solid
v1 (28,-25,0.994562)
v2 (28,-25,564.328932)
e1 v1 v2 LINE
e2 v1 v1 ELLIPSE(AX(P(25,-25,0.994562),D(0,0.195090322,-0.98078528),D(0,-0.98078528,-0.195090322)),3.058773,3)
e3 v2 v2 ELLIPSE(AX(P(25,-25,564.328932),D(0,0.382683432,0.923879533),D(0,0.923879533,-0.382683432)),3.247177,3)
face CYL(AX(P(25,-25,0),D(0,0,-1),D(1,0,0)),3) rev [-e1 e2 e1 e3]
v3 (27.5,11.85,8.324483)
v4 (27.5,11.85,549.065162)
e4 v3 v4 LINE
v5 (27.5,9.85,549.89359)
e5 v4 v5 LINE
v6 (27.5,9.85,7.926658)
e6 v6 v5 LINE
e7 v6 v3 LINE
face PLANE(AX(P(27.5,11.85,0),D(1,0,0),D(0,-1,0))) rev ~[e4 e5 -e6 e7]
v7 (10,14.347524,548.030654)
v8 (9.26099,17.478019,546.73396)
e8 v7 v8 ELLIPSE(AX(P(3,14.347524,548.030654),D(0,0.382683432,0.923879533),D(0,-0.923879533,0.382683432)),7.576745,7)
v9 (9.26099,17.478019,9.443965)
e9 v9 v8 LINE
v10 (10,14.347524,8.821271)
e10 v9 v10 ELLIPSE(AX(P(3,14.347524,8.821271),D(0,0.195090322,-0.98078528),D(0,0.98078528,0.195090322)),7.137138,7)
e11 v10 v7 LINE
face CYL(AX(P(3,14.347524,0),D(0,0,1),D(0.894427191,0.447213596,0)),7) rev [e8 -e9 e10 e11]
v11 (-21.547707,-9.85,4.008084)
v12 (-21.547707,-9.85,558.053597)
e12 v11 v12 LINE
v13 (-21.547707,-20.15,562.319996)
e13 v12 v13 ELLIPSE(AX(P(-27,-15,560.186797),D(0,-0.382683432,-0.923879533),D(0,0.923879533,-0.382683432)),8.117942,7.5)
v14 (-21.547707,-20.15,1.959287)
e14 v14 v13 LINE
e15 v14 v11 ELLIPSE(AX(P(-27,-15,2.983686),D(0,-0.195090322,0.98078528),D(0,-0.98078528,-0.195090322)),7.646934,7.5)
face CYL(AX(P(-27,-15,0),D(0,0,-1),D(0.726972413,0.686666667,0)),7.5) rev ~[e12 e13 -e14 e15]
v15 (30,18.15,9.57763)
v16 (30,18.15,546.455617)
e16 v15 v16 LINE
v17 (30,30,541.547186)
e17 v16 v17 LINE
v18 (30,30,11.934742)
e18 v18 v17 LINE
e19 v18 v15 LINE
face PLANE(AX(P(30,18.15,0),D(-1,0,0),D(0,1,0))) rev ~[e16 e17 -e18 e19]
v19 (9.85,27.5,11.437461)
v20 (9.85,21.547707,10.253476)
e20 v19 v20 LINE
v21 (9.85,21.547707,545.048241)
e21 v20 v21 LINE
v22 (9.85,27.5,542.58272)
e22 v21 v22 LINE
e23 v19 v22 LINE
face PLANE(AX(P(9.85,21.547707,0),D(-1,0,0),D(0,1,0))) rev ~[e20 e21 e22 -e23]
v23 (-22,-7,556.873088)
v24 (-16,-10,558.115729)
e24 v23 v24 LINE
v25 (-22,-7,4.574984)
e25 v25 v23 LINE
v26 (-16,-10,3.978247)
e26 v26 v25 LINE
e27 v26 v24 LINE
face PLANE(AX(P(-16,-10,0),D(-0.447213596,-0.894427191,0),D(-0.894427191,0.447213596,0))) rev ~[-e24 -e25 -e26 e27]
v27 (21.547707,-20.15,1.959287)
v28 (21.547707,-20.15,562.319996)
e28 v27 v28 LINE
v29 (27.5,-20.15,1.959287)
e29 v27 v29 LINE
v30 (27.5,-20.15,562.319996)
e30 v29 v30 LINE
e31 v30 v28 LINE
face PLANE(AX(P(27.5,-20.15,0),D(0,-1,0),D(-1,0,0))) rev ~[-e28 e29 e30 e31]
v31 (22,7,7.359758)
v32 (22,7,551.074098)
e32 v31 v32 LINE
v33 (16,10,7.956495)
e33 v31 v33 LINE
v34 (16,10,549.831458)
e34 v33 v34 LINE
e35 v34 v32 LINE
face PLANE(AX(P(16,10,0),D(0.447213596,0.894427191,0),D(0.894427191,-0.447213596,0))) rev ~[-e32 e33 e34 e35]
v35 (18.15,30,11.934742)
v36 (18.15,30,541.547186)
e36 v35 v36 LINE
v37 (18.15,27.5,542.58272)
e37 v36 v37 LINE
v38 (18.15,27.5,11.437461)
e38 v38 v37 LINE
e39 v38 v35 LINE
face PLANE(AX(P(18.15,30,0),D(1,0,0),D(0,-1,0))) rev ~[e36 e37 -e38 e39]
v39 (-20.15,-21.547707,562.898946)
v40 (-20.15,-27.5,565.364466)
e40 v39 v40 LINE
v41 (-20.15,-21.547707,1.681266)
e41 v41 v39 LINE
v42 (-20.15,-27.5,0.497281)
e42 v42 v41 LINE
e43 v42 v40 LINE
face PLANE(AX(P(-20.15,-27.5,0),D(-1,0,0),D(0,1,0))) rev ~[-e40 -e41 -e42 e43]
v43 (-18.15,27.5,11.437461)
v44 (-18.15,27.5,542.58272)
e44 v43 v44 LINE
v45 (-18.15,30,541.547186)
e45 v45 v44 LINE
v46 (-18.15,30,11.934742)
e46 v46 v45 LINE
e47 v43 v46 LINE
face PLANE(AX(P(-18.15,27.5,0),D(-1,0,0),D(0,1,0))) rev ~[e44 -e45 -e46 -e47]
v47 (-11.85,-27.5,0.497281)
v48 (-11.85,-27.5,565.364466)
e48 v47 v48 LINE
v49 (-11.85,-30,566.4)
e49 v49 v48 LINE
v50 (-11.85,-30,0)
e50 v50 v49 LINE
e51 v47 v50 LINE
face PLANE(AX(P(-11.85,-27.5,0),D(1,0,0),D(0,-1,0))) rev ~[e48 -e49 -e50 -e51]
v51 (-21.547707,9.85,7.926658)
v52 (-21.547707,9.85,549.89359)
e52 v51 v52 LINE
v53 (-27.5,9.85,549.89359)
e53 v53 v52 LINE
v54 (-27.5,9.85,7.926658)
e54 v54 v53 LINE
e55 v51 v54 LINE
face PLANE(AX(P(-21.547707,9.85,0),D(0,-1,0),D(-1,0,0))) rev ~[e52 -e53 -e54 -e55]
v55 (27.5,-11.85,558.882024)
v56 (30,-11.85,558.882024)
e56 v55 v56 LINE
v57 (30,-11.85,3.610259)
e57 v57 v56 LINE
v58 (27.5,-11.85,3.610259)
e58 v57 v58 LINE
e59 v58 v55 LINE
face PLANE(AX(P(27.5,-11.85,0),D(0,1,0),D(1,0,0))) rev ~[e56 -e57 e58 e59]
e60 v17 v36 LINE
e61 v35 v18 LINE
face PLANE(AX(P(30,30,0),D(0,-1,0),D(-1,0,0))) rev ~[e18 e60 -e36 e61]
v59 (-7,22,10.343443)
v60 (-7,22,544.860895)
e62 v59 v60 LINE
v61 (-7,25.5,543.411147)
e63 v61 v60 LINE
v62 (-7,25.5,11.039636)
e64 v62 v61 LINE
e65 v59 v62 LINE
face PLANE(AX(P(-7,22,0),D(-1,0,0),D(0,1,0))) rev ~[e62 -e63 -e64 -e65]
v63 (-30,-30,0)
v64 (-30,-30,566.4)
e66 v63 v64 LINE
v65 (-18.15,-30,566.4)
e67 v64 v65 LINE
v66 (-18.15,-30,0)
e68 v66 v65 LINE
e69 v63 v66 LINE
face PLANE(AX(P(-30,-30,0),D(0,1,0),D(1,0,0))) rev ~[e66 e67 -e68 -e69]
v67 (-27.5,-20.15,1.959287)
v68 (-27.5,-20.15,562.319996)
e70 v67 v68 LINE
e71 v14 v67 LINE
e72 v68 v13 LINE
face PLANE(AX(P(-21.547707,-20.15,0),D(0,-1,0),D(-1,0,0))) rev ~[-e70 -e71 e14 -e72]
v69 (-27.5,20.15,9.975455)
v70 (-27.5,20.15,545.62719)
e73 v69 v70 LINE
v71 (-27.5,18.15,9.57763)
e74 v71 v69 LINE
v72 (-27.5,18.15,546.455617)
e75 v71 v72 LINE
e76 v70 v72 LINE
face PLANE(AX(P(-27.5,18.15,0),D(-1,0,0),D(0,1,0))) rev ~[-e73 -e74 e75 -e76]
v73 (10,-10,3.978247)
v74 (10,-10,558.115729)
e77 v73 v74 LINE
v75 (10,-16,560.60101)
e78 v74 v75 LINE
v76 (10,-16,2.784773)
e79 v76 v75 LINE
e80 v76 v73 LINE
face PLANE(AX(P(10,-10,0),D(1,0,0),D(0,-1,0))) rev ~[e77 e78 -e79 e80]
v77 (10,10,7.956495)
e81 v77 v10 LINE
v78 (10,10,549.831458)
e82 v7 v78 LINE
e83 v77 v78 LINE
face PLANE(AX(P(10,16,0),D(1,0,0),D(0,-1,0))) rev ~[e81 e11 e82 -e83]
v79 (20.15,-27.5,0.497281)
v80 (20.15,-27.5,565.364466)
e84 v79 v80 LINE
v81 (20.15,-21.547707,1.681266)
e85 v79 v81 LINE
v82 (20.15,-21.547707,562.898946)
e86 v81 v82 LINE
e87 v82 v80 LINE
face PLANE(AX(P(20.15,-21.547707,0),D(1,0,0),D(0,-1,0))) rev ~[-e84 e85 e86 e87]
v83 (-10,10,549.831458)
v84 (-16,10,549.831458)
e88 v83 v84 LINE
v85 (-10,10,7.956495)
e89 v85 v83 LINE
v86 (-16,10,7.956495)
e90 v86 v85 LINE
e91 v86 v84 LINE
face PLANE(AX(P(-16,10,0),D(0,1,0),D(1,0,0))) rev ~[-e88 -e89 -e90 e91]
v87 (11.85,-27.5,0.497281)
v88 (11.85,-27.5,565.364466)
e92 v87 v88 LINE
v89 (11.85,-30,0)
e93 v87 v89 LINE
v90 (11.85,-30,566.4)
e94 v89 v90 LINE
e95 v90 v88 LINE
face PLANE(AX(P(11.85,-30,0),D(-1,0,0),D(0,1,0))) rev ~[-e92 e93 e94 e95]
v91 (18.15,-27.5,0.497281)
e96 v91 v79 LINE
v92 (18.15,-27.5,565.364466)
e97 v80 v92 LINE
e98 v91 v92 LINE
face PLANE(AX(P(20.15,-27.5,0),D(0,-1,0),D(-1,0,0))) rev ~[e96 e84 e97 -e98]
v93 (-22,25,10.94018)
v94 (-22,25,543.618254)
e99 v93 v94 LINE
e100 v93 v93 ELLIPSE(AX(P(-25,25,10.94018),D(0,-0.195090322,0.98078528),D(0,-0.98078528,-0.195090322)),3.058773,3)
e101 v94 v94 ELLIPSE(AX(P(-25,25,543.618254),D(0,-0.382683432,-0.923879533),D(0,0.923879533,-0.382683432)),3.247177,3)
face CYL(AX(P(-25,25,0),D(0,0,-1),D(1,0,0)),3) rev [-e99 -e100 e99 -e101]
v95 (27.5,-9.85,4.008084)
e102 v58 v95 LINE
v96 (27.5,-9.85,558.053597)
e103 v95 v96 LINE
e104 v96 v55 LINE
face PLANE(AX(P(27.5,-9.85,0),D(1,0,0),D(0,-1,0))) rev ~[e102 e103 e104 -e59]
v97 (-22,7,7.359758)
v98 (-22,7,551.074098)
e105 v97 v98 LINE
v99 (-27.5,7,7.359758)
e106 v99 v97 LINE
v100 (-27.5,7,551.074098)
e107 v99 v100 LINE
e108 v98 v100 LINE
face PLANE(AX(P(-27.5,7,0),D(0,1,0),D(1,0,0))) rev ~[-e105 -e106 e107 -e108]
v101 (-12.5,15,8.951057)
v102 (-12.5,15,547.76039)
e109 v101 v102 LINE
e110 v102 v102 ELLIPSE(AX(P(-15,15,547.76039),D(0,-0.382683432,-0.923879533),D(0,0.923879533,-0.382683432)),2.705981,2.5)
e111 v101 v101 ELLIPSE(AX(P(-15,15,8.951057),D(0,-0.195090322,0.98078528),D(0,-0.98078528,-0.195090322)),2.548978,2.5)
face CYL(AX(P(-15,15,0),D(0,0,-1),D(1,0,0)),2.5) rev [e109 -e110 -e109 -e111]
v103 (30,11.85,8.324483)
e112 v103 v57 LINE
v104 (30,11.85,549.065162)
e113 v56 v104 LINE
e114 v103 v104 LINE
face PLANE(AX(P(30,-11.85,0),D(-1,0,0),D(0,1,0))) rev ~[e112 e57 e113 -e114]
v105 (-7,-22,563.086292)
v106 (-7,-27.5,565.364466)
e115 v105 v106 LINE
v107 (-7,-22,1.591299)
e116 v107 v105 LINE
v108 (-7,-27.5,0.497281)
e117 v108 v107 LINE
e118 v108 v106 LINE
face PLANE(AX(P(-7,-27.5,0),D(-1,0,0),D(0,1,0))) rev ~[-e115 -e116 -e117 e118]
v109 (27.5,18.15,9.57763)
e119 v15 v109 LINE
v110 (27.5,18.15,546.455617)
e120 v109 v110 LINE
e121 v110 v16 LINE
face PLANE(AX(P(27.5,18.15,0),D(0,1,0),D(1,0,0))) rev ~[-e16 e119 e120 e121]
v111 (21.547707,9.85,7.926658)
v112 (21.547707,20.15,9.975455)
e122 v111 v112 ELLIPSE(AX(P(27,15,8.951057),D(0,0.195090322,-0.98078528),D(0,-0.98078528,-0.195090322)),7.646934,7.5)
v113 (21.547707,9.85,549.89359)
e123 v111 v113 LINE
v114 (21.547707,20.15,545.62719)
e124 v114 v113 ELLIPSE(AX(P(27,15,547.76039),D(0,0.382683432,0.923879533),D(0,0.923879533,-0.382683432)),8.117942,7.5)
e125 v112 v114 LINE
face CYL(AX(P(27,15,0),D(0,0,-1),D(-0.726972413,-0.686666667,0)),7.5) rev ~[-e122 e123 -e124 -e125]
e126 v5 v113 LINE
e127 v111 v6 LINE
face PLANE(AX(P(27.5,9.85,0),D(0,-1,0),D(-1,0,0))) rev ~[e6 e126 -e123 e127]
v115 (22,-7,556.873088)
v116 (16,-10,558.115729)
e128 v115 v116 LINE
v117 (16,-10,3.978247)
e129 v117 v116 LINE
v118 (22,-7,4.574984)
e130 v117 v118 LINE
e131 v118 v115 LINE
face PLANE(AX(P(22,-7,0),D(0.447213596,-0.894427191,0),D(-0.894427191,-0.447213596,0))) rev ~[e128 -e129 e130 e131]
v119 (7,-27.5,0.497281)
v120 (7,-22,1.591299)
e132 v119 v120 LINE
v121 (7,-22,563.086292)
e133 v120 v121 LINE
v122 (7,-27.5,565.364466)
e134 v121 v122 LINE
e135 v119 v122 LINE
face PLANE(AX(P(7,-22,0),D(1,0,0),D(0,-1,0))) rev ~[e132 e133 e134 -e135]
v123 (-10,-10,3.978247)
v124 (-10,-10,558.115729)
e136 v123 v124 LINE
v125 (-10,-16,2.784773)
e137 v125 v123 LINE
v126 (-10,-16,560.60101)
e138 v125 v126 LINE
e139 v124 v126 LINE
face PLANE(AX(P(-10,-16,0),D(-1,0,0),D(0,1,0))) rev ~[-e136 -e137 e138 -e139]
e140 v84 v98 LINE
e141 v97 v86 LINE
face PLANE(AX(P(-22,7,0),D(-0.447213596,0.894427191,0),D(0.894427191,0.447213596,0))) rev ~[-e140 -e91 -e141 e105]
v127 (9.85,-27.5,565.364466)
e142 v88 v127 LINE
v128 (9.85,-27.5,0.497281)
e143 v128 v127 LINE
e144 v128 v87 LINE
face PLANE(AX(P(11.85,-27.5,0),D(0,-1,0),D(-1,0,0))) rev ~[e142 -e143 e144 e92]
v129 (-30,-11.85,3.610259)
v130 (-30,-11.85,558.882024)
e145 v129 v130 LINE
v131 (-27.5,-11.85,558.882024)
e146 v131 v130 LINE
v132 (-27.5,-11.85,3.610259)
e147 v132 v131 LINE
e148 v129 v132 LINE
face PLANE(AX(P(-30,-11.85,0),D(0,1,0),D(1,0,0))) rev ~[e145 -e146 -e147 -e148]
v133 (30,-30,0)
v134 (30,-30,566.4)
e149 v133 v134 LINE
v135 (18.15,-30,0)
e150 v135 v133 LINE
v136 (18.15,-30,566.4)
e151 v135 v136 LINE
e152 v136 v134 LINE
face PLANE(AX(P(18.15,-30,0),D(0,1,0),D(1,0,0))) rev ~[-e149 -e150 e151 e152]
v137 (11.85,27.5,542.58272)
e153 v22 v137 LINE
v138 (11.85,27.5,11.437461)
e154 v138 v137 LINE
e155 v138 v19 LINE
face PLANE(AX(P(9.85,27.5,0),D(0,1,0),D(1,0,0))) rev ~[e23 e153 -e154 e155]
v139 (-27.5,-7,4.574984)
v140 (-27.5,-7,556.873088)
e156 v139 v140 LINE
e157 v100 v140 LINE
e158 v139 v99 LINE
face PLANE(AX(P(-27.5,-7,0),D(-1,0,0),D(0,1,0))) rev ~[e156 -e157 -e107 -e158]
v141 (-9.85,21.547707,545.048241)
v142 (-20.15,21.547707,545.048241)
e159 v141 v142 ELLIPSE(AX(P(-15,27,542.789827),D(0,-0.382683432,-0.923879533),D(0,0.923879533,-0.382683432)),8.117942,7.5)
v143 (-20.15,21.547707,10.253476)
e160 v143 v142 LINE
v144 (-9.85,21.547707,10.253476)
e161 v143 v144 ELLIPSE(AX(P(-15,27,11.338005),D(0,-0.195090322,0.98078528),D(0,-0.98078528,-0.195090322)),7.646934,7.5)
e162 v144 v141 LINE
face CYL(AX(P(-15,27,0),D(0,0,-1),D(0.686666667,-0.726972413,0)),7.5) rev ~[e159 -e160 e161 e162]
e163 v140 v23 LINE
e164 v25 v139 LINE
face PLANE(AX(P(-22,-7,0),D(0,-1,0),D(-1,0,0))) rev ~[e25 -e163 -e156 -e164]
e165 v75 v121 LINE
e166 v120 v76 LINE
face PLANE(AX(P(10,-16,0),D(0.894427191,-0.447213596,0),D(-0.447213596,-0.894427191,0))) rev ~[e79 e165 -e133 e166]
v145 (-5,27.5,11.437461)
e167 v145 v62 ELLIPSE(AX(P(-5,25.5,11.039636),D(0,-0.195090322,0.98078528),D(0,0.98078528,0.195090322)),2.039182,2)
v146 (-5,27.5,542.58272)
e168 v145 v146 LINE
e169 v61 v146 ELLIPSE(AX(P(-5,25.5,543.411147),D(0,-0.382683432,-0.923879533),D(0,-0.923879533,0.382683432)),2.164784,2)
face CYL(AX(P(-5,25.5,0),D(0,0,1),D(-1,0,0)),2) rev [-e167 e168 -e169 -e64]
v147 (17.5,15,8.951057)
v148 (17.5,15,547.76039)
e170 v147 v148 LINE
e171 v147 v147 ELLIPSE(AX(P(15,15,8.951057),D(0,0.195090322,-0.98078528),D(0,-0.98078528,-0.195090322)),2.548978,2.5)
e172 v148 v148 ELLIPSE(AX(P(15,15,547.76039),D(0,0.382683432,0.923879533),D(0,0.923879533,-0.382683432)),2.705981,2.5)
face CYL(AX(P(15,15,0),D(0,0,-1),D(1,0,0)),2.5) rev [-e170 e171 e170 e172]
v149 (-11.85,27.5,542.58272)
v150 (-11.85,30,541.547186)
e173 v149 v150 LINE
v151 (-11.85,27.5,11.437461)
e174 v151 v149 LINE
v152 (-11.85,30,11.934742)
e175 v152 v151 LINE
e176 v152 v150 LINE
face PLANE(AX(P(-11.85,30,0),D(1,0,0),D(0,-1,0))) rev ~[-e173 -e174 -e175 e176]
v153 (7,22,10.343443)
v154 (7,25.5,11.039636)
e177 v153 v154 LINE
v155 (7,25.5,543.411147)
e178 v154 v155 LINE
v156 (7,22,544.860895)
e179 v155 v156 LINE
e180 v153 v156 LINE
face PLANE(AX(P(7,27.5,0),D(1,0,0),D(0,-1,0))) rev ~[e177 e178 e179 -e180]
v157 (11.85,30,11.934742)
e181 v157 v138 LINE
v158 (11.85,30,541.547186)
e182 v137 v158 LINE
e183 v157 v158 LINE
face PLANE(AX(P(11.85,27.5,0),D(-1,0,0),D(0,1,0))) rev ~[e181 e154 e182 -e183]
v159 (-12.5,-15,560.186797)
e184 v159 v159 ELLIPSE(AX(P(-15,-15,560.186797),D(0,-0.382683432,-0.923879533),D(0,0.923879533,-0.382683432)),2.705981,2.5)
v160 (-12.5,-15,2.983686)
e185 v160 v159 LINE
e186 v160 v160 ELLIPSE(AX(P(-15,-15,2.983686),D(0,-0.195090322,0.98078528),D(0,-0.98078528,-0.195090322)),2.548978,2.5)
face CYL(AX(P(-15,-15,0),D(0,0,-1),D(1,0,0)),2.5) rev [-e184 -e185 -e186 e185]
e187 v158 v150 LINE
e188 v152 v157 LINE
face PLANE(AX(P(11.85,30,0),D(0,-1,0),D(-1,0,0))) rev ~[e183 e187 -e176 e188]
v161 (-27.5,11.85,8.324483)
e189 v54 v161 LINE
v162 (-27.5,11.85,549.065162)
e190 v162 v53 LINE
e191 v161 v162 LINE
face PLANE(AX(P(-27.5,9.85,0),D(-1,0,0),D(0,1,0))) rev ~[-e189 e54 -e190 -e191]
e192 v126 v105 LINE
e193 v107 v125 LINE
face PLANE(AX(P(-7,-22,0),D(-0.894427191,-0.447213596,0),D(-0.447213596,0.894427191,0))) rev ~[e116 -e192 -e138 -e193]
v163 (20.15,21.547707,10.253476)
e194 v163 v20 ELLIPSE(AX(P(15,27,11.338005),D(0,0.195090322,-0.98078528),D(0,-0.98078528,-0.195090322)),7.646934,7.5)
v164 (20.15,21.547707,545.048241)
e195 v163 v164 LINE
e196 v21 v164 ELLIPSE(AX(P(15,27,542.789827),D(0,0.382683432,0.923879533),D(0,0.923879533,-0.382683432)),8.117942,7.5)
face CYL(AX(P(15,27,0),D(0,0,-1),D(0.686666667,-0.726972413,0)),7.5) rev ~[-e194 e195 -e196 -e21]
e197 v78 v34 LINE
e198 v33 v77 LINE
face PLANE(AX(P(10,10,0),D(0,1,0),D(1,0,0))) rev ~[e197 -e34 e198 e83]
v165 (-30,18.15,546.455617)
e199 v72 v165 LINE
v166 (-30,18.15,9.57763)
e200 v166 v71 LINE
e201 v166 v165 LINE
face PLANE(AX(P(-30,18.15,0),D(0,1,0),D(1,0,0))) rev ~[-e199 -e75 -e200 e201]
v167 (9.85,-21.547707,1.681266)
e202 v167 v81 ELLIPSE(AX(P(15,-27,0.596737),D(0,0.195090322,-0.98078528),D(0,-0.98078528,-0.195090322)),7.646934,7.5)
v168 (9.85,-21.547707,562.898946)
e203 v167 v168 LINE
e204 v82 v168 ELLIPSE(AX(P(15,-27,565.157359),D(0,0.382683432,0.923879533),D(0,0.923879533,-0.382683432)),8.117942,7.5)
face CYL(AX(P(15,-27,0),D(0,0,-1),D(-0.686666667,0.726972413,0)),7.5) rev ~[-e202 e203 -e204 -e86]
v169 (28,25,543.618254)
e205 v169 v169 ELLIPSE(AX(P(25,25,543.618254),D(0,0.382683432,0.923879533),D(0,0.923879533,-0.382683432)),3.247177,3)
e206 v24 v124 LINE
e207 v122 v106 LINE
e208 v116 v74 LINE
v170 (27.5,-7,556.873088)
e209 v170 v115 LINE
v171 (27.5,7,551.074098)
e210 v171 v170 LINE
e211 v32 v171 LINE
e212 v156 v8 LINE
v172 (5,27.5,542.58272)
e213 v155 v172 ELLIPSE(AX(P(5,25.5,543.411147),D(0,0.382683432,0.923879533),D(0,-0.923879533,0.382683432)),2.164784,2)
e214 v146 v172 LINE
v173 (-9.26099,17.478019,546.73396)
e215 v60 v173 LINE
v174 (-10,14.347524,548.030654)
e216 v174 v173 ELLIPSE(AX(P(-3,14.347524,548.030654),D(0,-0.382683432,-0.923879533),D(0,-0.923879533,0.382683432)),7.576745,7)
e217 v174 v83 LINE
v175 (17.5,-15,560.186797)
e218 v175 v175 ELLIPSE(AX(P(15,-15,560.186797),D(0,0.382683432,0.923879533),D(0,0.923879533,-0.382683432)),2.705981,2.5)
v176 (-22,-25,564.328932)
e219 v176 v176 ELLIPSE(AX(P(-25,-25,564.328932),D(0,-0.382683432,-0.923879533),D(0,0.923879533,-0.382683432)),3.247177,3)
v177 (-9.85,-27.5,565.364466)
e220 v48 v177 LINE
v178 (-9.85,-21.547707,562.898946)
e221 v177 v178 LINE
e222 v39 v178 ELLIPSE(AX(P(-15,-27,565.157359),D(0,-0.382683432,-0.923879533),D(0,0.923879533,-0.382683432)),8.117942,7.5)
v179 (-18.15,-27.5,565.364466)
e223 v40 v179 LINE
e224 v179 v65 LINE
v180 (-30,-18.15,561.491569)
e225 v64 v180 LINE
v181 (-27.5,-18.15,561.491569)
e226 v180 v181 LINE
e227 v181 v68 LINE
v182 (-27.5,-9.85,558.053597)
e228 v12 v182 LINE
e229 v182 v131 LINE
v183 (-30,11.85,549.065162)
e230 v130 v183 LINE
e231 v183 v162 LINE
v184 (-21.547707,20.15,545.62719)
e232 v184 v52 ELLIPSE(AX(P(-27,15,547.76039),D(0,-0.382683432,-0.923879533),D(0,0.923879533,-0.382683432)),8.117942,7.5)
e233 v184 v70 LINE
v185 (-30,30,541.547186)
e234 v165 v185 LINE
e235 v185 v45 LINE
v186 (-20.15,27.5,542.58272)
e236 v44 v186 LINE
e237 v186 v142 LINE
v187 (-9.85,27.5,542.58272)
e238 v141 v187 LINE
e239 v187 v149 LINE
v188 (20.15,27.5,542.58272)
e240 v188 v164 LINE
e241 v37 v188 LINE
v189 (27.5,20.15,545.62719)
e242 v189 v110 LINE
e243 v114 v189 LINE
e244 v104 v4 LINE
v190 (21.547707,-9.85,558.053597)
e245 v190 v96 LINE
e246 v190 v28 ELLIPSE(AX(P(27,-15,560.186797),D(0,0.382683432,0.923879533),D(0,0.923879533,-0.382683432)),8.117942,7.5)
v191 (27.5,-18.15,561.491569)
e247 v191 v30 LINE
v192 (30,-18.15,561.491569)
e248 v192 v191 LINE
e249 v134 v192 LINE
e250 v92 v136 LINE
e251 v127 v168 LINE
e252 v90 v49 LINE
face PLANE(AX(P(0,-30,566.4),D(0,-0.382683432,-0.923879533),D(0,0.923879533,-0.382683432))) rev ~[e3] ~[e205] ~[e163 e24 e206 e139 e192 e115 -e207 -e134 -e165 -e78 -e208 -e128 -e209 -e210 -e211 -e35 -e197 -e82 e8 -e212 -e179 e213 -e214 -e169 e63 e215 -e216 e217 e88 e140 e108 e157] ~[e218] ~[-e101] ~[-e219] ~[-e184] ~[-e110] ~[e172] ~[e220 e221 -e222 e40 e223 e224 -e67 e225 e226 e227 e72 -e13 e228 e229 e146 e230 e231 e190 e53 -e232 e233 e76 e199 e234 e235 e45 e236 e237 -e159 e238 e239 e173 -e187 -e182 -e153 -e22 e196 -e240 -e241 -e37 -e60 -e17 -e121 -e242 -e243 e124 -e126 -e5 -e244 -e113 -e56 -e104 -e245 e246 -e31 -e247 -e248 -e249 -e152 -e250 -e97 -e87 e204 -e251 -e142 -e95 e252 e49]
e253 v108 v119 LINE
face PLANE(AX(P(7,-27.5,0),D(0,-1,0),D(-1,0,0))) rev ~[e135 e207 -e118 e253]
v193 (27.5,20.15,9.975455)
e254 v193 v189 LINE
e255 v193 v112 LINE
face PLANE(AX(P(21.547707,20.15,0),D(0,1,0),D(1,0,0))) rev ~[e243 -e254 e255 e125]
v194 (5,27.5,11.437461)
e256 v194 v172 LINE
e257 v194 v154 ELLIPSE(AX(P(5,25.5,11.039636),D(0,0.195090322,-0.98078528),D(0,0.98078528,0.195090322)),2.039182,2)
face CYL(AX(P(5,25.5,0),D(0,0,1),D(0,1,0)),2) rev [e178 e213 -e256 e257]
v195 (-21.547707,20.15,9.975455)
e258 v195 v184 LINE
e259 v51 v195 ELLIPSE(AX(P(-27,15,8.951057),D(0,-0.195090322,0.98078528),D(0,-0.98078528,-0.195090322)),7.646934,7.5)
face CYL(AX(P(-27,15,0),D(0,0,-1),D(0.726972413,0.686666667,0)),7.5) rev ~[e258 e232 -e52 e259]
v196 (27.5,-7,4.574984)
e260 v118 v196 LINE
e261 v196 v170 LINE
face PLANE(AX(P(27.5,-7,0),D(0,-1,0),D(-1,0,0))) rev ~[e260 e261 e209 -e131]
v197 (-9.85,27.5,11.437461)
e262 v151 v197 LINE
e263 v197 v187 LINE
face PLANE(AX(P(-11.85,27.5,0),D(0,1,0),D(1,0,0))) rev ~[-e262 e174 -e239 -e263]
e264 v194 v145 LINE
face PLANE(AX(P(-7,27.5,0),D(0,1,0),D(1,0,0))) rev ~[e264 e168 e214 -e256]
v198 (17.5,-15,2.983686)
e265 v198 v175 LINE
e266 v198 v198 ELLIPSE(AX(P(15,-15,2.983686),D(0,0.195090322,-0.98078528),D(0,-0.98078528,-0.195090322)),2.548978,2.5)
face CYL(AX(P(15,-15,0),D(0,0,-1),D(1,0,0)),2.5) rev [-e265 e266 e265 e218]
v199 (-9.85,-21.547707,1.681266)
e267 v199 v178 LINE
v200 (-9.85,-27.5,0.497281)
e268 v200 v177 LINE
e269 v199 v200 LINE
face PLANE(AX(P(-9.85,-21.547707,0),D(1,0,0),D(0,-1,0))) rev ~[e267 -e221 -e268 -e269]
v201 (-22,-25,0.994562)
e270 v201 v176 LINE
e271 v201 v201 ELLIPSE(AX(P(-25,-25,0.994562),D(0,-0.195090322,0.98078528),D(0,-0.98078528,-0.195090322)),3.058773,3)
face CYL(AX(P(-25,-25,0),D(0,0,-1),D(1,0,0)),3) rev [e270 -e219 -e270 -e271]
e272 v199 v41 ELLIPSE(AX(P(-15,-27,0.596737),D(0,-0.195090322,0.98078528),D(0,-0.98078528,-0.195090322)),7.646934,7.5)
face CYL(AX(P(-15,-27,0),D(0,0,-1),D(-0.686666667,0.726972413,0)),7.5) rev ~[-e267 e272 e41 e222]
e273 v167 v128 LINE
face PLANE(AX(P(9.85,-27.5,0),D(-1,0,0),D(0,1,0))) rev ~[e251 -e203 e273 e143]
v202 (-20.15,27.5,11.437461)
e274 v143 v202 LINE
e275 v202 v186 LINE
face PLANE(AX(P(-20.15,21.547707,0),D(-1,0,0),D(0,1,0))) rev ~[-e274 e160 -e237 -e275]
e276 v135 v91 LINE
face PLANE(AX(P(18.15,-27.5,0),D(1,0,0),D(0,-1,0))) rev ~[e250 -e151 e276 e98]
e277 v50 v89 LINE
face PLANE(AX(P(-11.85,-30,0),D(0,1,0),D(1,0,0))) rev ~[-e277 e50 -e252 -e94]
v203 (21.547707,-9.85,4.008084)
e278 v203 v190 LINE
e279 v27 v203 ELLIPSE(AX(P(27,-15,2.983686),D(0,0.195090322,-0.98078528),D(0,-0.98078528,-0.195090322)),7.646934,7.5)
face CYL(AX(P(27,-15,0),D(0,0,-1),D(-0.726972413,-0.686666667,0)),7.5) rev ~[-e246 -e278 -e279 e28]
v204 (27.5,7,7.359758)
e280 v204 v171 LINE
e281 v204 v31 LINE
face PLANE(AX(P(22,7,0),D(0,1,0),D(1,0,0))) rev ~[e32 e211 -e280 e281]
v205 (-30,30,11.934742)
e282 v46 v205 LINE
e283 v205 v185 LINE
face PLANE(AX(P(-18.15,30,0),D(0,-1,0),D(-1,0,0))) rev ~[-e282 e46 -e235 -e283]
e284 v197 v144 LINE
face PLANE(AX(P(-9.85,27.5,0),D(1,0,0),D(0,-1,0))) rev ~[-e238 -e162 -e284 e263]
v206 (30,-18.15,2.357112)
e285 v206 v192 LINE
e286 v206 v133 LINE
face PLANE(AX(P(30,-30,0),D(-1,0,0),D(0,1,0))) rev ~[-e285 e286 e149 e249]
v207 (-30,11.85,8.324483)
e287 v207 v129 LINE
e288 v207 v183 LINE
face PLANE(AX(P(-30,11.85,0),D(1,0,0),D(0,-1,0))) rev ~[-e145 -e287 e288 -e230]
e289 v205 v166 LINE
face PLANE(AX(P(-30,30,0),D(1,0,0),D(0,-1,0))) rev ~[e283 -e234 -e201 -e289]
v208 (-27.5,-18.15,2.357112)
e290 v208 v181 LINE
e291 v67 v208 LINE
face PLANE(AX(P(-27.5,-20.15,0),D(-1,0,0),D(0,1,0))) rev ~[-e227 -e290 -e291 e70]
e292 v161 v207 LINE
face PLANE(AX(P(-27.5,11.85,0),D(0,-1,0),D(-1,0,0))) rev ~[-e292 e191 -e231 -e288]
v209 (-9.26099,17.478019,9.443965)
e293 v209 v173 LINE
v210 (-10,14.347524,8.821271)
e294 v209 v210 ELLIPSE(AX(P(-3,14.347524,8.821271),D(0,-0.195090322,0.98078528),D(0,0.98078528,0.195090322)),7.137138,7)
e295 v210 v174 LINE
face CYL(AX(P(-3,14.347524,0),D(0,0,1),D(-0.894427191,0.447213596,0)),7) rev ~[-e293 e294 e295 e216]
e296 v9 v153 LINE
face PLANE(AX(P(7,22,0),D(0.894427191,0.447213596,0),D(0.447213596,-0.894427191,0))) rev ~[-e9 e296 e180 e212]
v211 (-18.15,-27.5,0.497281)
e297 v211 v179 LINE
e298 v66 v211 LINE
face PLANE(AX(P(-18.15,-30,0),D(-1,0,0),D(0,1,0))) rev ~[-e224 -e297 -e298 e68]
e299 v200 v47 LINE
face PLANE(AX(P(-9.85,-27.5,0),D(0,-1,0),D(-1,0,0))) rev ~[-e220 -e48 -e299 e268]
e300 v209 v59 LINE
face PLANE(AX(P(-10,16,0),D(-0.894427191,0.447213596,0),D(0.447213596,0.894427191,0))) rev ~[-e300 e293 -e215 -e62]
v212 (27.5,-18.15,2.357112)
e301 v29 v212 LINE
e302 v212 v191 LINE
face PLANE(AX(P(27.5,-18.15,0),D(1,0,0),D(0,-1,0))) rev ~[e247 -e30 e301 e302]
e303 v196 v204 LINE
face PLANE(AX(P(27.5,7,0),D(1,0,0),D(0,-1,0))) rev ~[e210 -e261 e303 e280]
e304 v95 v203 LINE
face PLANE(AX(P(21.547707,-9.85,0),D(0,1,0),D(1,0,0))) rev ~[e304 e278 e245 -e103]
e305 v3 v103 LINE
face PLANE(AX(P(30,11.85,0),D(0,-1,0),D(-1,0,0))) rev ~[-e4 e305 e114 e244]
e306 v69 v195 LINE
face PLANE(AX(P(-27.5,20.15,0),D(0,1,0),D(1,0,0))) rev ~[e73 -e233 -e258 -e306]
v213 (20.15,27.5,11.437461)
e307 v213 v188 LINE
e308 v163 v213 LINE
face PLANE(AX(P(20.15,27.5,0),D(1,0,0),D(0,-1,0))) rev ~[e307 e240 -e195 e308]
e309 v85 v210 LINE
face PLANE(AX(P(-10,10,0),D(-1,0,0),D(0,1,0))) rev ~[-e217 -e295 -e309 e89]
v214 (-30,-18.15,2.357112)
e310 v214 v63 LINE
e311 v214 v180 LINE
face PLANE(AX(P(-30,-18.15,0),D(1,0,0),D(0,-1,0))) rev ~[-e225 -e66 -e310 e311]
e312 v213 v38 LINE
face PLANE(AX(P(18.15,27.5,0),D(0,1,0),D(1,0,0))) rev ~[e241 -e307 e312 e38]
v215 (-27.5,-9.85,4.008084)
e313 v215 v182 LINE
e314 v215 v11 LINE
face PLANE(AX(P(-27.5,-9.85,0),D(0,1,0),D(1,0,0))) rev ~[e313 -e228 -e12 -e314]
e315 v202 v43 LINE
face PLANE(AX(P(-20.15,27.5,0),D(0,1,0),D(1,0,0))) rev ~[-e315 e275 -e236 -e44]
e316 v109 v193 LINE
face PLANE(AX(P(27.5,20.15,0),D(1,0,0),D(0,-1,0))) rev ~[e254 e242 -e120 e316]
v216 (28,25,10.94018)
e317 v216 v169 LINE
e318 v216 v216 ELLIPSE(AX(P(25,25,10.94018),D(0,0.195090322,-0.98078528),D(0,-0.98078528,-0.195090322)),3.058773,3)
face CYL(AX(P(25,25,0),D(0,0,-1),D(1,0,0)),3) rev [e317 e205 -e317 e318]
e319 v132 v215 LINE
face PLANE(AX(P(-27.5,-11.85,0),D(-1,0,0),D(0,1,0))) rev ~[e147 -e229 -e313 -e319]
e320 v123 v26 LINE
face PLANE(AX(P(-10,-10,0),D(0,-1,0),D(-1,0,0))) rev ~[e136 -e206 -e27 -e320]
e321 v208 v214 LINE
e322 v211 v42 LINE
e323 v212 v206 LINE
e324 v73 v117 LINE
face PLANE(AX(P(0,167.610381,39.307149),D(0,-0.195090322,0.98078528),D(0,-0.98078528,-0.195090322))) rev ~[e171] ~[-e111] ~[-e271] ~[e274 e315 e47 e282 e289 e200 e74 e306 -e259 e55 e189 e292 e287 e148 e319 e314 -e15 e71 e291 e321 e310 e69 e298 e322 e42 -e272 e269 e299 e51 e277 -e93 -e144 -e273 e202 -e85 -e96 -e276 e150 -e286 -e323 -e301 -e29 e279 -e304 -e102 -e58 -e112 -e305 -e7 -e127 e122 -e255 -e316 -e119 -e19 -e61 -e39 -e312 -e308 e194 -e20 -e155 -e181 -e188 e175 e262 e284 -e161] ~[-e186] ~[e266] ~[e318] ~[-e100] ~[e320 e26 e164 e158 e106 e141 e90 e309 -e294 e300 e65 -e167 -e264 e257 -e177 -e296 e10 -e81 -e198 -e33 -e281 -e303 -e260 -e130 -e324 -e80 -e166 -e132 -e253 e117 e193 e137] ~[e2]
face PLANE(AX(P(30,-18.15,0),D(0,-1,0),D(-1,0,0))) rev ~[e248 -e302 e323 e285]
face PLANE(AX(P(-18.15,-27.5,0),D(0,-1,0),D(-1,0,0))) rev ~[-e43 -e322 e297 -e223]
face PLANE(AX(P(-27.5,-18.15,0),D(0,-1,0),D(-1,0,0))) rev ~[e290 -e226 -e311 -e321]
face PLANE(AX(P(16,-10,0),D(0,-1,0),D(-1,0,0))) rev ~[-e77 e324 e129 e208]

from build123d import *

# Parameters (mm, degrees)
F0_R          = 3
F0_R_2        = 2.5
F1_DEPTH      = 566.4
F2_R          = 2
F3_R          = 7
F6_DEPTH      = 30
F6_DEPTH_BACK = 30


# Not quite as in the source:
# - a feature names something its author has since deleted; it is built from what else it names


with BuildPart() as f1:
    # F0 (on Top) → F1 (new body)
    with BuildSketch(Plane.XY):
        with BuildLine():
            Line((18.15, -30), (30, -30))
            Line((30, -30), (30, -18.15))
            Line((30, -18.15), (27.5, -18.15))
            Line((27.5, -18.15), (27.5, -20.15))
            Line((27.5, -20.15), (21.5477069044, -20.15))
            ThreePointArc((21.5477069044, -20.15), (19.5, -15), (21.5477069044, -9.85))
            Line((21.5477069044, -9.85), (27.5, -9.85))
            Line((27.5, -9.85), (27.5, -11.85))
            Line((27.5, -11.85), (30, -11.85))
            Line((30, -11.85), (30, 11.85))
            Line((30, 11.85), (27.5, 11.85))
            Line((27.5, 11.85), (27.5, 9.85))
            Line((27.5, 9.85), (21.5477069044, 9.85))
            ThreePointArc((21.5477069044, 9.85), (19.5, 15), (21.5477069044, 20.15))
            Line((21.5477069044, 20.15), (27.5, 20.15))
            Line((27.5, 20.15), (27.5, 18.15))
            Line((27.5, 18.15), (30, 18.15))
            Line((30, 18.15), (30, 30))
            Line((30, 30), (18.15, 30))
            Line((18.15, 30), (18.15, 27.5))
            Line((18.15, 27.5), (20.15, 27.5))
            Line((20.15, 27.5), (20.15, 21.5477069044))
            ThreePointArc((20.15, 21.5477069044), (15, 19.5), (9.85, 21.5477069044))
            Line((9.85, 21.5477069044), (9.85, 27.5))
            Line((9.85, 27.5), (11.85, 27.5))
            Line((11.85, 27.5), (11.85, 30))
            Line((11.85, 30), (-11.85, 30))
            Line((-11.85, 30), (-11.85, 27.5))
            Line((-11.85, 27.5), (-9.85, 27.5))
            Line((-9.85, 27.5), (-9.85, 21.5477069044))
            ThreePointArc((-9.85, 21.5477069044), (-15, 19.5), (-20.15, 21.5477069044))
            Line((-20.15, 21.5477069044), (-20.15, 27.5))
            Line((-20.15, 27.5), (-18.15, 27.5))
            Line((-18.15, 27.5), (-18.15, 30))
            Line((-18.15, 30), (-30, 30))
            Line((-30, 30), (-30, 18.15))
            Line((-30, 18.15), (-27.5, 18.15))
            Line((-27.5, 18.15), (-27.5, 20.15))
            Line((-27.5, 20.15), (-21.5477069044, 20.15))
            ThreePointArc((-21.5477069044, 20.15), (-19.5, 15), (-21.5477069044, 9.85))
            Line((-21.5477069044, 9.85), (-27.5, 9.85))
            Line((-27.5, 9.85), (-27.5, 11.85))
            Line((-27.5, 11.85), (-30, 11.85))
            Line((-30, 11.85), (-30, -11.85))
            Line((-30, -11.85), (-27.5, -11.85))
            Line((-27.5, -11.85), (-27.5, -9.85))
            Line((-27.5, -9.85), (-21.5477069044, -9.85))
            ThreePointArc((-21.5477069044, -9.85), (-19.5, -15), (-21.5477069044, -20.15))
            Line((-21.5477069044, -20.15), (-27.5, -20.15))
            Line((-27.5, -20.15), (-27.5, -18.15))
            Line((-27.5, -18.15), (-30, -18.15))
            Line((-30, -18.15), (-30, -30))
            Line((-30, -30), (-18.15, -30))
            Line((-18.15, -30), (-18.15, -27.5))
            Line((-18.15, -27.5), (-20.15, -27.5))
            Line((-20.15, -27.5), (-20.15, -21.5477069044))
            ThreePointArc((-20.15, -21.5477069044), (-15, -19.5), (-9.85, -21.5477069044))
            Line((-9.85, -21.5477069044), (-9.85, -27.5))
            Line((-9.85, -27.5), (-11.85, -27.5))
            Line((-11.85, -27.5), (-11.85, -30))
            Line((-11.85, -30), (11.85, -30))
            Line((11.85, -30), (11.85, -27.5))
            Line((11.85, -27.5), (9.85, -27.5))
            Line((9.85, -27.5), (9.85, -21.5477069044))
            ThreePointArc((9.85, -21.5477069044), (15, -19.5), (20.15, -21.5477069044))
            Line((20.15, -21.5477069044), (20.15, -27.5))
            Line((20.15, -27.5), (18.15, -27.5))
            Line((18.15, -27.5), (18.15, -30))
        make_face()
        with Locations((-25, -25)):
            Circle(F0_R, mode=Mode.SUBTRACT)
        with Locations((-15, -15)):
            Circle(F0_R_2, mode=Mode.SUBTRACT)
        with Locations((25, -25)):
            Circle(F0_R, mode=Mode.SUBTRACT)
        with Locations((15, -15)):
            Circle(F0_R_2, mode=Mode.SUBTRACT)
        with Locations((-25, 25)):
            Circle(F0_R, mode=Mode.SUBTRACT)
        with Locations((-15, 15)):
            Circle(F0_R_2, mode=Mode.SUBTRACT)
        Polygon((-7, 22), (-7, 27.5), (0, 27.5), (7, 27.5), (7, 22), (10, 16), (10, 10), (16, 10), (22, 7), (27.5, 7), (27.5, 0), (27.5, -7), (22, -7), (16, -10), (10, -10), (10, -16), (7, -22), (7, -27.5), (0, -27.5), (-7, -27.5), (-7, -22), (-10, -16), (-10, -10), (-16, -10), (-22, -7), (-27.5, -7), (-27.5, 0), (-27.5, 7), (-22, 7), (-16, 10), (-10, 10), (-10, 16), align=None, mode=Mode.SUBTRACT)
        with Locations((15, 15)):
            Circle(F0_R_2, mode=Mode.SUBTRACT)
        with Locations((25, 25)):
            Circle(F0_R, mode=Mode.SUBTRACT)
    extrude(amount=F1_DEPTH)

    # F2
    f2_edges = [f1.edges().sort_by_distance(p)[0] for p in [
        (-7, 27.5, 283.2),
        (7, 27.5, 283.2),
    ]]
    fillet(f2_edges, radius=F2_R)

    # F3
    f3_edges = [f1.edges().sort_by_distance(p)[0] for p in [
        (-10, 16, 283.2),
        (10, 16, 283.2),
    ]]
    fillet(f3_edges, radius=F3_R)

    # F5 (on Right) → F6 (cut, two sides)
    with BuildSketch(Plane.YZ) as f6_sk:
        Polygon((-5.9431682558, -120.9418602831), (191.6672123159, -81.6347116648), (167.6103805717, 39.3071486183), (-30, 0), align=None)
        Polygon((112.1150393779, 507.5340232725), (142.1183047075, 579.9683133465), (0.0032653295, 638.834290074), (-30, 566.4), align=None)
    extrude(amount=F6_DEPTH, mode=Mode.SUBTRACT)
    extrude(f6_sk.sketch, amount=-F6_DEPTH_BACK, mode=Mode.SUBTRACT)


solid = f1.part
